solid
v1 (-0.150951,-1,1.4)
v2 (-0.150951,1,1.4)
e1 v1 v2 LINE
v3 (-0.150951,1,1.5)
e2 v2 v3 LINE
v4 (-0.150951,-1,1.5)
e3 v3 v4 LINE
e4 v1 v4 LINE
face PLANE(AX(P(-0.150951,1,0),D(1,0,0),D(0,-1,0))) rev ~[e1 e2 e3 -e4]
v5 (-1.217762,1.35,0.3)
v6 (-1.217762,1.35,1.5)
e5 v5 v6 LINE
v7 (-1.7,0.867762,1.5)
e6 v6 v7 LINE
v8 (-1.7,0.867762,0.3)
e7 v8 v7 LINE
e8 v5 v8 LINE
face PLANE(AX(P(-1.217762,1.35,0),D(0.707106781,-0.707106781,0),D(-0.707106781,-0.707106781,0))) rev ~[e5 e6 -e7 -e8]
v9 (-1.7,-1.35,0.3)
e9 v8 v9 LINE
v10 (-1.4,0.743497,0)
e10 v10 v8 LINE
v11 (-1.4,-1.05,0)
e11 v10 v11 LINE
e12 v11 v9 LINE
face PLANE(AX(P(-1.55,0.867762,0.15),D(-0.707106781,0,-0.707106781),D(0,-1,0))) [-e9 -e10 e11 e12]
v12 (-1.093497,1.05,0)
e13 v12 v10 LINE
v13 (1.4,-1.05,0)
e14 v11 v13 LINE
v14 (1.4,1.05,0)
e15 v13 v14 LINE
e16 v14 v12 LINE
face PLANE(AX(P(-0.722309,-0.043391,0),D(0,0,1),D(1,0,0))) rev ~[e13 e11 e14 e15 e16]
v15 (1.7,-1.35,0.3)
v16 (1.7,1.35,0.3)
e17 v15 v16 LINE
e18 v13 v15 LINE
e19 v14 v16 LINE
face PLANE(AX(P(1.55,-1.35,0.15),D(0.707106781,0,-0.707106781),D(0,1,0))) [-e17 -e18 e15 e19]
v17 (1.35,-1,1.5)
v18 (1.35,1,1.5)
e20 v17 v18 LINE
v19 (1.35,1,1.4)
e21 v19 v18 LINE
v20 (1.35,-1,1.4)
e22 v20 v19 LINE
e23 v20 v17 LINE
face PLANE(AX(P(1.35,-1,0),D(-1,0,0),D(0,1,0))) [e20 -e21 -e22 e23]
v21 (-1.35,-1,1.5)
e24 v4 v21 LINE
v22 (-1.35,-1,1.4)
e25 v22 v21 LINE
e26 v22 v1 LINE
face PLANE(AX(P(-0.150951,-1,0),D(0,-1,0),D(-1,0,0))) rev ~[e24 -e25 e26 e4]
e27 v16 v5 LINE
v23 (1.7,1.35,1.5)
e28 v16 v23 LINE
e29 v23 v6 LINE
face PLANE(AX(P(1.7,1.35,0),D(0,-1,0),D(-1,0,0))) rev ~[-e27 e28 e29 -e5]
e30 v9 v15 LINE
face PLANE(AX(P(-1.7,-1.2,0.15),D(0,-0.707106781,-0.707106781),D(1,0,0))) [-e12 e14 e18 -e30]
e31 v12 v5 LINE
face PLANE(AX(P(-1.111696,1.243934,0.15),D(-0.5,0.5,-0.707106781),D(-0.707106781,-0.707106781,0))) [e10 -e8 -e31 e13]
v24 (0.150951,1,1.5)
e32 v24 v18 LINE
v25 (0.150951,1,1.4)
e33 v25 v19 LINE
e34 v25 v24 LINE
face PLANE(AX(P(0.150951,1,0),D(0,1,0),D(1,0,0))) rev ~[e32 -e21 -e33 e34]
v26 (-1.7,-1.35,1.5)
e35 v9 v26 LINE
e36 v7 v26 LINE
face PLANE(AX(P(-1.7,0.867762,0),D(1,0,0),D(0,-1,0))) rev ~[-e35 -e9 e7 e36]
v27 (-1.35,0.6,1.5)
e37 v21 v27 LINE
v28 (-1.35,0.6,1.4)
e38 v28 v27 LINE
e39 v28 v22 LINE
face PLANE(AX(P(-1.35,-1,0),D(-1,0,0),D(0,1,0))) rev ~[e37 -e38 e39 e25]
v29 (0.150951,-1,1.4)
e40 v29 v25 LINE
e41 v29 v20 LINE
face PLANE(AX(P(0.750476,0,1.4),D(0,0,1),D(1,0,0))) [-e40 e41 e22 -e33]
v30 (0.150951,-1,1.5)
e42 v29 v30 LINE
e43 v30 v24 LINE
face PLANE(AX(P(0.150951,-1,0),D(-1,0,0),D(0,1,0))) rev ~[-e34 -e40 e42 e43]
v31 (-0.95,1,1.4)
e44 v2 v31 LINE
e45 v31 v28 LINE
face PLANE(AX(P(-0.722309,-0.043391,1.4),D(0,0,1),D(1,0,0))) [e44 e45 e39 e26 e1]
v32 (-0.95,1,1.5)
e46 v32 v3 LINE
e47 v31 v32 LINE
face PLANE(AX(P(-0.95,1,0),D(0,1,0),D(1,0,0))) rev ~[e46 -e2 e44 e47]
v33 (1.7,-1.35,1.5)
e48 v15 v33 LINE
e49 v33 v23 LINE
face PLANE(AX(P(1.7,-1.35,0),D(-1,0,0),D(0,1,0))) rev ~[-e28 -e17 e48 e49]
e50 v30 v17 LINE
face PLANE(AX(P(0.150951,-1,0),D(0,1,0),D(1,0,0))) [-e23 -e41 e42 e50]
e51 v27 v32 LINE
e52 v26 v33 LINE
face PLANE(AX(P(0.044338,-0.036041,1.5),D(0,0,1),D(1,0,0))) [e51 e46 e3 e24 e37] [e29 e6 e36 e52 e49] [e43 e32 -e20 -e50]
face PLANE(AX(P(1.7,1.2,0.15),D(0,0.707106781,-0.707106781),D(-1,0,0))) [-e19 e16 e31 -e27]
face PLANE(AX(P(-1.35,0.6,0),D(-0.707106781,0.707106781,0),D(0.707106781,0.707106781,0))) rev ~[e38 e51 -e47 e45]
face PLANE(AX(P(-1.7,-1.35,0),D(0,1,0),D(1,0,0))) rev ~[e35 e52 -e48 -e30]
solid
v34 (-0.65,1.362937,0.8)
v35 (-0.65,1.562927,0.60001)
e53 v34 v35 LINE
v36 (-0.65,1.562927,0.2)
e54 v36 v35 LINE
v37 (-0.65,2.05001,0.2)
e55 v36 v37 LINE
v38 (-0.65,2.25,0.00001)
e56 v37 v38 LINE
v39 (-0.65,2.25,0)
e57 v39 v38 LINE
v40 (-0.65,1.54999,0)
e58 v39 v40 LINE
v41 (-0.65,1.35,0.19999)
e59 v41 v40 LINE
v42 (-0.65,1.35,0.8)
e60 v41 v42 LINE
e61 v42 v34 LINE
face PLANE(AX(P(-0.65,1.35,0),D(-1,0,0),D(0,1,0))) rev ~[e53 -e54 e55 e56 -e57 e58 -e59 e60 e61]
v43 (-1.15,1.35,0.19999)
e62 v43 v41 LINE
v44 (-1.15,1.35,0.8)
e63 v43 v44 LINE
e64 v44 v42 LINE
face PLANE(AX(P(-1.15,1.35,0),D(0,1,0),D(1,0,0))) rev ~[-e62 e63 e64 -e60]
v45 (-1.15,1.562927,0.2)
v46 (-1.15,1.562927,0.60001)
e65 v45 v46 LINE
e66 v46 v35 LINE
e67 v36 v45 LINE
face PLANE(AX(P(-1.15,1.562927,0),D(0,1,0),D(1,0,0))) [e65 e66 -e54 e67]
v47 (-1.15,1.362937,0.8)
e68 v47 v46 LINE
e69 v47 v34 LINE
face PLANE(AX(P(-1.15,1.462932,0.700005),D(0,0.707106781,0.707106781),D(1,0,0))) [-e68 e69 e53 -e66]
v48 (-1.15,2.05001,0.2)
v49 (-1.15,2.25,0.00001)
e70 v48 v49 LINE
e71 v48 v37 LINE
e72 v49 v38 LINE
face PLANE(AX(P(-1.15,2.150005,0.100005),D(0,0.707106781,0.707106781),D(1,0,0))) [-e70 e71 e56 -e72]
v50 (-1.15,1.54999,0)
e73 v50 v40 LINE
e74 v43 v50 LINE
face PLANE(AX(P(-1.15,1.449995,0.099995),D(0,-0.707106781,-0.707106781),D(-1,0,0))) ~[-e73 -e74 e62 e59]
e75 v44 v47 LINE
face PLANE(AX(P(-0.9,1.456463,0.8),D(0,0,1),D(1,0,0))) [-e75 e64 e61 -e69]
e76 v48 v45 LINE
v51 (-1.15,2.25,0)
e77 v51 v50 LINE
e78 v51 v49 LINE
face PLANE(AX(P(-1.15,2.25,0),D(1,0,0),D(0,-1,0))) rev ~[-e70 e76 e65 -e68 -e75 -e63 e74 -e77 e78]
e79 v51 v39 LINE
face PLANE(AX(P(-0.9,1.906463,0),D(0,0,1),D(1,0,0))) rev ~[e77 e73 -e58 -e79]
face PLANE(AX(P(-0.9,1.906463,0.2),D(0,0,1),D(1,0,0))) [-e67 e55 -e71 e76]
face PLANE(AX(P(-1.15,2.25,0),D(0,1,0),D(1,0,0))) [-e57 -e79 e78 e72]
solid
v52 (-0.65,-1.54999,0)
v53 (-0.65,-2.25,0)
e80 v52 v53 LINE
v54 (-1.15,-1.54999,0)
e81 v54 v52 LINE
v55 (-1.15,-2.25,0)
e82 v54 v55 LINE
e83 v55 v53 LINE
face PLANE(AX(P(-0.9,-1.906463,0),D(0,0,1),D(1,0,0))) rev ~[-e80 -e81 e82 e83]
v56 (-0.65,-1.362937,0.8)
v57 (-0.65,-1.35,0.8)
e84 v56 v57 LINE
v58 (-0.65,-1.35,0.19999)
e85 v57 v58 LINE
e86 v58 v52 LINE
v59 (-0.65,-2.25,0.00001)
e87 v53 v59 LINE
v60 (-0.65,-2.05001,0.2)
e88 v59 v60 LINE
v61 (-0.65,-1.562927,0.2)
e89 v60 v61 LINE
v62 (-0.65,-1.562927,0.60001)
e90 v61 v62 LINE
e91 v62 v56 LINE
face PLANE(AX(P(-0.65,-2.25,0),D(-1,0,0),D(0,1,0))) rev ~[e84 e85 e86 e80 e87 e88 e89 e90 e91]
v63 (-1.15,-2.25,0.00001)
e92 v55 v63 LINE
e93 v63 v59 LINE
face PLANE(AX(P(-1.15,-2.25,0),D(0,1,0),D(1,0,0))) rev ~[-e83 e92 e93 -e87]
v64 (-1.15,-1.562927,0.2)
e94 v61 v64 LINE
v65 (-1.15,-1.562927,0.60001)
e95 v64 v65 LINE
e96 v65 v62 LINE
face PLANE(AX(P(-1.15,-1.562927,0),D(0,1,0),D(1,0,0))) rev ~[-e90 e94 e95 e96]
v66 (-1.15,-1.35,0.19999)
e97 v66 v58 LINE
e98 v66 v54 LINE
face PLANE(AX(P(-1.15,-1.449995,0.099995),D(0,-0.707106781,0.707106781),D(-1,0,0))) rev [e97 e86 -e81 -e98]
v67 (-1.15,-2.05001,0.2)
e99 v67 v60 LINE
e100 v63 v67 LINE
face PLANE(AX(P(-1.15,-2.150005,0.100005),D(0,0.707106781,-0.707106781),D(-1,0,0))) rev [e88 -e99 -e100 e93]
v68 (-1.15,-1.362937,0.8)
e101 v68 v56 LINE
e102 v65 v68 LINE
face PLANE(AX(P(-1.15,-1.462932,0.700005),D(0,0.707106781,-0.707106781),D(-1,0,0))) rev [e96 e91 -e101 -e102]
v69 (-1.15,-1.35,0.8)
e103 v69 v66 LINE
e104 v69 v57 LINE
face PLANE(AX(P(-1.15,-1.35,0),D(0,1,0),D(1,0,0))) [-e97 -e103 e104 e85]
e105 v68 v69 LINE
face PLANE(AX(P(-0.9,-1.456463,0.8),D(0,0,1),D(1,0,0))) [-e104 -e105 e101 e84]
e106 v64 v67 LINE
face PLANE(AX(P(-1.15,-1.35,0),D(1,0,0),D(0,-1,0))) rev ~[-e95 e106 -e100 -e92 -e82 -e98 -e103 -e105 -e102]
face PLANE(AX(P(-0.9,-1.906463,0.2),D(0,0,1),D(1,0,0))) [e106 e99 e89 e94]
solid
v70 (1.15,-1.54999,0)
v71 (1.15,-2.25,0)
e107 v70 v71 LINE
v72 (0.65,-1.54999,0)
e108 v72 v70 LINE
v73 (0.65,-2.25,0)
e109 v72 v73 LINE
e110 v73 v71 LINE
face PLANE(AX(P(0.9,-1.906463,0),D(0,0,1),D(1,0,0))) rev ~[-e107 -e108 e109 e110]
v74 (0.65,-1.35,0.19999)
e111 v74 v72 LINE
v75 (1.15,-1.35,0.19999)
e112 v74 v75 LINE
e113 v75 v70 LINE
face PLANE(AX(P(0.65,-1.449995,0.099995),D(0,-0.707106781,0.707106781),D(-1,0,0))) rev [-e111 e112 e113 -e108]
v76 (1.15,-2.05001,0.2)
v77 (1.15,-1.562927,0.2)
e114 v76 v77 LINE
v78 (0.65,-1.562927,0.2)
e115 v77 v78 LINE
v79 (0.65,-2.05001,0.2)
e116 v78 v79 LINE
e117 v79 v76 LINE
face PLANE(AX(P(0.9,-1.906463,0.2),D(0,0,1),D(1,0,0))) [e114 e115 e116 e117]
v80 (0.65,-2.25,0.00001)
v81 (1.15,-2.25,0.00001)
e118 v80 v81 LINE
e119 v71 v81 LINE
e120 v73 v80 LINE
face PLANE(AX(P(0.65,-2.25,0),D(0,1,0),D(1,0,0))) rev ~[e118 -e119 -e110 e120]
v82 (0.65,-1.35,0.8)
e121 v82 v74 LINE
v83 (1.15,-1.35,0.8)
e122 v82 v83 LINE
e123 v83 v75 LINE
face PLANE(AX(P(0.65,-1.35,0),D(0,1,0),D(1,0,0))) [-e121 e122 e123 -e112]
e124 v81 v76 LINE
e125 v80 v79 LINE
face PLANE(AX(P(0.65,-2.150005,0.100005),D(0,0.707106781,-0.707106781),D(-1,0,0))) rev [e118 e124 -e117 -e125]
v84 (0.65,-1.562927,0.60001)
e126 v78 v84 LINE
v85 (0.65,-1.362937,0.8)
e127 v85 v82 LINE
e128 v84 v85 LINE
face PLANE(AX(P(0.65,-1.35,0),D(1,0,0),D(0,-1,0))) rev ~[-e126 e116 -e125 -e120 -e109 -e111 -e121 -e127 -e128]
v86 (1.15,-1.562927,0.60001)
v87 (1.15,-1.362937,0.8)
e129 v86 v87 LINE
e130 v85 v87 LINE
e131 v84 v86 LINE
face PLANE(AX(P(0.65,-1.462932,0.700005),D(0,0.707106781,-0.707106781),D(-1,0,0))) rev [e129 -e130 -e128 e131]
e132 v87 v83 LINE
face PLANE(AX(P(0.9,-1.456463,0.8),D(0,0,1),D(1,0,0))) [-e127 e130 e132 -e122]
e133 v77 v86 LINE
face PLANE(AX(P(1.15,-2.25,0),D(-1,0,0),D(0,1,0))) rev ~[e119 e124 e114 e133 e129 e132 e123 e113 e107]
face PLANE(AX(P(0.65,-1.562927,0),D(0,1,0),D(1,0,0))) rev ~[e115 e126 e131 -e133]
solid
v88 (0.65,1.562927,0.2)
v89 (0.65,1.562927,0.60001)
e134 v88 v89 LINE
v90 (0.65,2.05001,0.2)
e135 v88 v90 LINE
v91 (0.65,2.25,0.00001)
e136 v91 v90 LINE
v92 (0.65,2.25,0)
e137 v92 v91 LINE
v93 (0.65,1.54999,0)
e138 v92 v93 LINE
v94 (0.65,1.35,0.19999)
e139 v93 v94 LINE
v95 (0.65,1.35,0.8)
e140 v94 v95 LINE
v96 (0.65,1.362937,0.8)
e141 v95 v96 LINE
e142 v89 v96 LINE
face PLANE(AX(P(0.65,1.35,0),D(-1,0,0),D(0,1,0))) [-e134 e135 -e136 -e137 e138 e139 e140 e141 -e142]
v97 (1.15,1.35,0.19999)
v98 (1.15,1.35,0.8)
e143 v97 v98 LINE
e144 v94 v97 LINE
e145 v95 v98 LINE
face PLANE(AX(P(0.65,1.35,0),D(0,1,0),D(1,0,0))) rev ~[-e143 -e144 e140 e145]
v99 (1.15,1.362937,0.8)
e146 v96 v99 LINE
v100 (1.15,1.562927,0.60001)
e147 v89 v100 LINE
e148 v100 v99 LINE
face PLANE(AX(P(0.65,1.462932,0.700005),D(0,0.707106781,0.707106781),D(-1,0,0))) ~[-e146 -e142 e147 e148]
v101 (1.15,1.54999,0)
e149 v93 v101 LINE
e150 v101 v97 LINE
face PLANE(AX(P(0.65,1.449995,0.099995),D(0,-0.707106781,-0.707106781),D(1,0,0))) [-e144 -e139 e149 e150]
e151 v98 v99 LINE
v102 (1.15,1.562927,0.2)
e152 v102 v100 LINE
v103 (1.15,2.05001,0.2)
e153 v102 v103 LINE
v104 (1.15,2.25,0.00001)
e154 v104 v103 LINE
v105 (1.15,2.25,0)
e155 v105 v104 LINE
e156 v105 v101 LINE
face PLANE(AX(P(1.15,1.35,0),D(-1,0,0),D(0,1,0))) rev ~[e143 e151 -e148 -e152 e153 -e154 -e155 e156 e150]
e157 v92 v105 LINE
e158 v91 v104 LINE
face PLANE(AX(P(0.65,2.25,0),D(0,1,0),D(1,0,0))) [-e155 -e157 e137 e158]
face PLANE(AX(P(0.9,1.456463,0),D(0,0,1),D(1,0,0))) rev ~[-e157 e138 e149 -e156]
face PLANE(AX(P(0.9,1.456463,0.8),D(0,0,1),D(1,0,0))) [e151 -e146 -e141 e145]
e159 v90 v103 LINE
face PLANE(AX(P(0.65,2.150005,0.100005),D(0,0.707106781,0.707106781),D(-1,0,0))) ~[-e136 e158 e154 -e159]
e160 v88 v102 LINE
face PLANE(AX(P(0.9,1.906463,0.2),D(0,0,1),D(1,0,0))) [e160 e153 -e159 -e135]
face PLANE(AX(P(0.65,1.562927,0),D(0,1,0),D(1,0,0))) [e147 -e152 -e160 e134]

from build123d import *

# Parameters (mm, degrees)
F0_W      = 1.1990487342
F0_H      = 2
F1_DEPTH  = 1.5
F2_DEPTH  = 1.4
F3_SIZE   = 0.3
F0_W_2    = 0.5
F0_H_2    = 0.6870733146
F0_H_3    = 0.2129266854
F4_DEPTH  = 0.2
F5_DEPTH  = 0.8
F6_SIZE   = 0.19999
F6_2_SIZE = 0.19999
F6_3_SIZE = 0.19999
F6_4_SIZE = 0.19999


# Not quite as in the source:
# - a fillet or chamfer is up to 0.001 mm smaller than in the source, because OpenCascade refuses the exact size


with BuildPart() as f1:
    # F0 (on Top) → F1 (new body)
    with BuildSketch(Plane.XY):
        Polygon((1.7, -1.35), (1.7, 1.35), (1.15, 1.35), (0.65, 1.35), (-0.65, 1.35), (-1.15, 1.35), (-1.2177615426, 1.35), (-1.7, 0.8677615426), (-1.7, -1.35), (-1.15, -1.35), (-0.65, -1.35), (0.65, -1.35), (1.15, -1.35), align=None)
        Polygon((-1.35, -1), (-1.35, 0.6), (-0.95, 1), (-0.1509512658, 1), (-0.1509512658, -1), align=None, mode=Mode.SUBTRACT)
        with Locations((0.7504756329, 0)):
            Rectangle(F0_W, F0_H, mode=Mode.SUBTRACT)
    extrude(amount=F1_DEPTH)

    # F0 (on Top) → F2 (join)
    with BuildSketch(Plane.XY):
        Polygon((-0.95, 1), (-1.35, 0.6), (-1.35, -1), (-0.1509512658, -1), (-0.1509512658, 1), align=None)
        with Locations((0.7504756329, 0)):
            Rectangle(F0_W, F0_H)
    extrude(amount=F2_DEPTH)

    # F3
    f3_edges = [f1.edges().sort_by_distance(p)[0] for p in [
        (-1.7, -0.241119, 0),
        (-1.458881, 1.108881, 0),
        (0.241119, 1.35, 0),
        (0, -1.35, 0),
        (1.7, 0, 0),
    ]]
    chamfer(f3_edges, length=F3_SIZE)


with BuildPart() as f4:
    # F0 (on Top) → F4 (new body)
    with BuildSketch(Plane.XY):
        with Locations((-0.9, 1.9064633427)):
            Rectangle(F0_W_2, F0_H_2)
        with Locations((-0.9, 1.4564633427)):
            Rectangle(F0_W_2, F0_H_3)
    extrude(amount=F4_DEPTH)

    # F0 (on Top) → F5, piece 2 (join)
    with BuildSketch(Plane.XY):
        with Locations((-0.9, 1.4564633427)):
            Rectangle(F0_W_2, F0_H_3)
    extrude(amount=F5_DEPTH)

    # F6 (size 0.2 in the source; OpenCascade refuses exactly that, so slightly less here)
    f6_edges = [f4.edges().sort_by_distance(p)[0] for p in [
        (-0.9, 2.25, 0.2),
        (-0.9, 1.35, 0),
        (-0.9, 1.562927, 0.8),
    ]]
    chamfer(f6_edges, length=F6_SIZE)


with BuildPart() as f4b:
    # F0 (on Top) → F4, piece 2 (new body)
    with BuildSketch(Plane.XY):
        with Locations((0.9, 1.9064633427)):
            Rectangle(F0_W_2, F0_H_2)
    extrude(amount=F4_DEPTH)

    # F0 (on Top) → F5 (join)
    with BuildSketch(Plane.XY):
        with Locations((0.9, 1.4564633427)):
            Rectangle(F0_W_2, F0_H_3)
    extrude(amount=F5_DEPTH)

    # F6#2 (size 0.2 in the source; OpenCascade refuses exactly that, so slightly less here)
    f6_2_edges = [f4b.edges().sort_by_distance(p)[0] for p in [
        (0.9, 1.35, 0),
        (0.9, 2.25, 0.2),
        (0.9, 1.562927, 0.8),
    ]]
    chamfer(f6_2_edges, length=F6_2_SIZE)


with BuildPart() as f4c:
    # F0 (on Top) → F4, piece 3 (new body)
    with BuildSketch(Plane.XY):
        with Locations((-0.9, -1.9064633427)):
            Rectangle(F0_W_2, F0_H_2)
        with Locations((-0.9, -1.4564633427)):
            Rectangle(F0_W_2, F0_H_3)
    extrude(amount=F4_DEPTH)

    # F0 (on Top) → F5, piece 3 (join)
    with BuildSketch(Plane.XY):
        with Locations((-0.9, -1.4564633427)):
            Rectangle(F0_W_2, F0_H_3)
    extrude(amount=F5_DEPTH)

    # F6#3 (size 0.2 in the source; OpenCascade refuses exactly that, so slightly less here)
    f6_3_edges = [f4c.edges().sort_by_distance(p)[0] for p in [
        (-0.9, -2.25, 0.2),
        (-0.9, -1.35, 0),
        (-0.9, -1.562927, 0.8),
    ]]
    chamfer(f6_3_edges, length=F6_3_SIZE)


with BuildPart() as f4d:
    # F0 (on Top) → F4, piece 4 (new body)
    with BuildSketch(Plane.XY):
        with Locations((0.9, -1.9064633427)):
            Rectangle(F0_W_2, F0_H_2)
        with Locations((0.9, -1.4564633427)):
            Rectangle(F0_W_2, F0_H_3)
    extrude(amount=F4_DEPTH)

    # F0 (on Top) → F5, piece 4 (join)
    with BuildSketch(Plane.XY):
        with Locations((0.9, -1.4564633427)):
            Rectangle(F0_W_2, F0_H_3)
    extrude(amount=F5_DEPTH)

    # F6#4 (size 0.2 in the source; OpenCascade refuses exactly that, so slightly less here)
    f6_4_edges = [f4d.edges().sort_by_distance(p)[0] for p in [
        (0.9, -2.25, 0.2),
        (0.9, -1.35, 0),
        (0.9, -1.562927, 0.8),
    ]]
    chamfer(f6_4_edges, length=F6_4_SIZE)


solid = Compound([f1.part, f4.part, f4b.part, f4c.part, f4d.part])
